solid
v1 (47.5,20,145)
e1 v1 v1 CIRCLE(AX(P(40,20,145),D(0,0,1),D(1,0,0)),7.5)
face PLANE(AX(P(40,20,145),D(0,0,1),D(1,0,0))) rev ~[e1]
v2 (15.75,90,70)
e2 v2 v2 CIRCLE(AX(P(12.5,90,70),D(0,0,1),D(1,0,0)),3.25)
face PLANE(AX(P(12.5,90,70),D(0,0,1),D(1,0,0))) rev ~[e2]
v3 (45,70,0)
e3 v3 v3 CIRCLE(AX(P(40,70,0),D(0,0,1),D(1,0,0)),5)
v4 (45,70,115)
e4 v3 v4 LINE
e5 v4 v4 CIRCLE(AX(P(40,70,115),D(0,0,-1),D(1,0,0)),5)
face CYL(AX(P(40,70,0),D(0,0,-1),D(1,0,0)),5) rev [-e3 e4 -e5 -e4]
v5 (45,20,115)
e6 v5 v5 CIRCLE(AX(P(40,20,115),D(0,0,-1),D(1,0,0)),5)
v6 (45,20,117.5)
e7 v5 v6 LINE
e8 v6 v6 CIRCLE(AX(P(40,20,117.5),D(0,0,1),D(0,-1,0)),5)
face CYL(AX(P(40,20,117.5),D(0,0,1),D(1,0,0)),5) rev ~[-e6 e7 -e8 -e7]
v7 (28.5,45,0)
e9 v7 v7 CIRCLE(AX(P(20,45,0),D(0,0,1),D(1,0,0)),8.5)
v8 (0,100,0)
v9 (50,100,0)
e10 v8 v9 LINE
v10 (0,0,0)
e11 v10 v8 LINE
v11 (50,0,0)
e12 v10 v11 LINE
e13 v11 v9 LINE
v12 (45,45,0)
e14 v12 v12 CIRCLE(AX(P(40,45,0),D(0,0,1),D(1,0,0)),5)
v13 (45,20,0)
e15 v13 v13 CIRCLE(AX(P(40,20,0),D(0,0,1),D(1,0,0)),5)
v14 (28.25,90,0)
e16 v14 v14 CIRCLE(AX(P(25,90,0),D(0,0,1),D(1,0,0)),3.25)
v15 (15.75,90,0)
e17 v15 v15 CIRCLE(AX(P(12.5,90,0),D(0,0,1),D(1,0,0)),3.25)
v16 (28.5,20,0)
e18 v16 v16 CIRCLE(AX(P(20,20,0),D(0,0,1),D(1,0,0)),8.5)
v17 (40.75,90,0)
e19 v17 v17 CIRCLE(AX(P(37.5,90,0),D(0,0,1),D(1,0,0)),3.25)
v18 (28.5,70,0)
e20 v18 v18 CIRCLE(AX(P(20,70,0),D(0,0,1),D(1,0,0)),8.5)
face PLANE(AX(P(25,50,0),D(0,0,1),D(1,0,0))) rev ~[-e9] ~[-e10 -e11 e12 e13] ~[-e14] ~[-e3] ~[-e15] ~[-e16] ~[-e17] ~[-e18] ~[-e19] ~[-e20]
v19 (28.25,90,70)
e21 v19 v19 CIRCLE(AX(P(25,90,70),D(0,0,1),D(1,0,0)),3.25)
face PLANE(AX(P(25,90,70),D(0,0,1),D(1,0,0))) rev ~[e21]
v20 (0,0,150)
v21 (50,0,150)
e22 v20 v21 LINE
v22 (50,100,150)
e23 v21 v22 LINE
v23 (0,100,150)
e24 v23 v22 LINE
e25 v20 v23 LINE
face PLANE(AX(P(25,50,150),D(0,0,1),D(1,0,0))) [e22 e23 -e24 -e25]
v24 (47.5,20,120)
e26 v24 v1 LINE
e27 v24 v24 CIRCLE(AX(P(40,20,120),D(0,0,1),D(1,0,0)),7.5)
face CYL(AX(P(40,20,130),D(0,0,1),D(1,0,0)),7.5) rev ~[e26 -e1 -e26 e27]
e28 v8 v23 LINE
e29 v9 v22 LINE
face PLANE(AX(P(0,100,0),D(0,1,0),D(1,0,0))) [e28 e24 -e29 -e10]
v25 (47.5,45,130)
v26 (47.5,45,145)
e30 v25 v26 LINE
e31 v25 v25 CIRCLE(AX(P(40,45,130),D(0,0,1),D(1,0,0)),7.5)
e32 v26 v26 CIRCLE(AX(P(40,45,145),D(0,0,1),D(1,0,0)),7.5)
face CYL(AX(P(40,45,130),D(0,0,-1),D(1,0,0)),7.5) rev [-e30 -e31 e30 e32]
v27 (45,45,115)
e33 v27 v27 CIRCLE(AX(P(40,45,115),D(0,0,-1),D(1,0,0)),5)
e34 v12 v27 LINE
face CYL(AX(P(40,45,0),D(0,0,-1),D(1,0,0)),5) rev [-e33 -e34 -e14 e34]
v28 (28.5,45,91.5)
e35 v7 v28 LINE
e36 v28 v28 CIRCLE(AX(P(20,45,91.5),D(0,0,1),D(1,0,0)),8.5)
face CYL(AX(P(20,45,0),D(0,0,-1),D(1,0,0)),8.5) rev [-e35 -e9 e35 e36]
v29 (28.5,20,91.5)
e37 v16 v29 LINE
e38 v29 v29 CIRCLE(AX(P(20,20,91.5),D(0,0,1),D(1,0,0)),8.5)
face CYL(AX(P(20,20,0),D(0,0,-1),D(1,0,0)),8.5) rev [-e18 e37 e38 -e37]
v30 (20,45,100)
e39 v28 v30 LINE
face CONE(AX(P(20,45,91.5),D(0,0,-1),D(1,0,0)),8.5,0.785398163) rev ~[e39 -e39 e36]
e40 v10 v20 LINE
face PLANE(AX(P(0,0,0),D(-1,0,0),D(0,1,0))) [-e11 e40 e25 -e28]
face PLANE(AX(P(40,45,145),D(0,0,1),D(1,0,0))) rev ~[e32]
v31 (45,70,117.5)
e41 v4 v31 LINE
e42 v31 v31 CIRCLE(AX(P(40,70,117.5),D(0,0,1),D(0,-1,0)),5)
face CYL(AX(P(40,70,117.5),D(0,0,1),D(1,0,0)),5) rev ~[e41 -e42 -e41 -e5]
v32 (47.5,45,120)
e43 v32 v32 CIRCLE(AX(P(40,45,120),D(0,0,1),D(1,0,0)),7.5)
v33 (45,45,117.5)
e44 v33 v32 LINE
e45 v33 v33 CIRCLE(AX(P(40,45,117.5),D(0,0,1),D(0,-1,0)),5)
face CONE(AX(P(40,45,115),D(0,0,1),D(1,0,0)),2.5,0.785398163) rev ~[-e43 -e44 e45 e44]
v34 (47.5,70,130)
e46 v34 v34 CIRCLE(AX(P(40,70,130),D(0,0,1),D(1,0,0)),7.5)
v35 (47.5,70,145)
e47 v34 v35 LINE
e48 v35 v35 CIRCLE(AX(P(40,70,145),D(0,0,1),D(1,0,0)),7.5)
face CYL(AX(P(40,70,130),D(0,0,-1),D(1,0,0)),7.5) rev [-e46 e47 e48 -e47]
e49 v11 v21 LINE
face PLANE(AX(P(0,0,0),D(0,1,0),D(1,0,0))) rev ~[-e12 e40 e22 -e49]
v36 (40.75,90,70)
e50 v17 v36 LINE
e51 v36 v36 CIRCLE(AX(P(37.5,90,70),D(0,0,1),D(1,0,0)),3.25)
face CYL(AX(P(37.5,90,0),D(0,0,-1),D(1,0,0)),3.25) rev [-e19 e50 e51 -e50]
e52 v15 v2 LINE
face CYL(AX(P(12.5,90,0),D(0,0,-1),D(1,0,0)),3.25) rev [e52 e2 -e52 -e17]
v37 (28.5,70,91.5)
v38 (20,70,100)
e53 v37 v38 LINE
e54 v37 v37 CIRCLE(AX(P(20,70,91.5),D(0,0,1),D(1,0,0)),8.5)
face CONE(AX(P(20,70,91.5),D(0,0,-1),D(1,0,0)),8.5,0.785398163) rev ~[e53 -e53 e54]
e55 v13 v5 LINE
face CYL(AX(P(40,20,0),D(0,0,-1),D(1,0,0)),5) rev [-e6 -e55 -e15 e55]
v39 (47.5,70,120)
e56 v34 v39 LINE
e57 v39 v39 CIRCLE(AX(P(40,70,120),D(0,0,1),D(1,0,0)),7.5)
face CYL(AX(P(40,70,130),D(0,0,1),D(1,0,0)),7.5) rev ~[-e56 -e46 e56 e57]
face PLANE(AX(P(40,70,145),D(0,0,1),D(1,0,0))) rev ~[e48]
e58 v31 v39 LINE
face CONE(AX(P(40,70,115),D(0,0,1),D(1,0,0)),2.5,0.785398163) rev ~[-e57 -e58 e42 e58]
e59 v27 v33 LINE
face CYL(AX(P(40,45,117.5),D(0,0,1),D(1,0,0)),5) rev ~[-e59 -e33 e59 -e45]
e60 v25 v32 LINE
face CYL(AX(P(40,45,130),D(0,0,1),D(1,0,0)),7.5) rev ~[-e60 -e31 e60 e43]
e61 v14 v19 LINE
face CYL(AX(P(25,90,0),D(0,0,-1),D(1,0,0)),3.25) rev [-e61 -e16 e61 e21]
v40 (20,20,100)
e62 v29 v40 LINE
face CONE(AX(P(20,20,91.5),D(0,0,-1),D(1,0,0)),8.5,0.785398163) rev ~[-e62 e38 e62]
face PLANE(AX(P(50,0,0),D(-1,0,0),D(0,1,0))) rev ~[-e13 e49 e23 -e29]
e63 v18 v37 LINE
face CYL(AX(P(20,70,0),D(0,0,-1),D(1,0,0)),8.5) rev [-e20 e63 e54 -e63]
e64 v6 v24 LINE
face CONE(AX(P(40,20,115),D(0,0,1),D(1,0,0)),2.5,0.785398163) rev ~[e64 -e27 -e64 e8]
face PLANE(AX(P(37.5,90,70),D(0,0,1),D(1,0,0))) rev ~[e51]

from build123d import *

# Parameters (mm, degrees)
F0_W          = 50
F0_H          = 100
F0_R          = 8.5
F0_R_2        = 5
F0_R_3        = 3.25
F1_DEPTH      = 150
F2_DEPTH      = 100
F3_DEPTH      = 70
F4_DEPTH      = 130
F8_R          = 7.5
F9_DEPTH      = 15
F10_S5_R      = 5
F10_T6_DEPTH  = 12
F10_S11_R     = 5
F10_T12_DEPTH = 12
F10_S17_R     = 5
F10_T18_DEPTH = 12
F11_SIZE      = 8.5


# Not quite as in the source:
# - a fillet or chamfer that OpenCascade refuses, or shapes differently, is made with other operations: its cross-section is extruded or revolved along the edge and cut away or added


with BuildPart() as f1:
    # F0 (on Top) → F1 (new body)
    with BuildSketch(Plane.XY):
        with Locations((25, 50)):
            Rectangle(F0_W, F0_H)
        with Locations((20, 20)):
            Circle(F0_R, mode=Mode.SUBTRACT)
        with Locations((20, 45)):
            Circle(F0_R, mode=Mode.SUBTRACT)
        with Locations((40, 20)):
            Circle(F0_R_2, mode=Mode.SUBTRACT)
        with Locations((40, 45)):
            Circle(F0_R_2, mode=Mode.SUBTRACT)
        with Locations((20, 70)):
            Circle(F0_R, mode=Mode.SUBTRACT)
        with Locations((12.5, 90)):
            Circle(F0_R_3, mode=Mode.SUBTRACT)
        with Locations((40, 70)):
            Circle(F0_R_2, mode=Mode.SUBTRACT)
        with Locations((25, 90)):
            Circle(F0_R_3, mode=Mode.SUBTRACT)
        with Locations((37.5, 90)):
            Circle(F0_R_3, mode=Mode.SUBTRACT)
        with Locations((12.5, 90)):
            Circle(F0_R_3)
        with Locations((25, 90)):
            Circle(F0_R_3)
        with Locations((37.5, 90)):
            Circle(F0_R_3)
        with Locations((40, 70)):
            Circle(F0_R_2)
        with Locations((20, 70)):
            Circle(F0_R)
        with Locations((40, 45)):
            Circle(F0_R_2)
        with Locations((40, 20)):
            Circle(F0_R_2)
        with Locations((20, 20)):
            Circle(F0_R)
        with Locations((20, 45)):
            Circle(F0_R)
    extrude(amount=F1_DEPTH)

    # F0 (on Top) → F2 (cut)
    with BuildSketch(Plane.XY):
        with Locations((20, 20)):
            Circle(F0_R)
        with Locations((20, 45)):
            Circle(F0_R)
        with Locations((20, 70)):
            Circle(F0_R)
    extrude(amount=F2_DEPTH, mode=Mode.SUBTRACT)

    # F0 (on Top) → F3 (cut)
    with BuildSketch(Plane.XY):
        with Locations((37.5, 90)):
            Circle(F0_R_3)
        with Locations((25, 90)):
            Circle(F0_R_3)
        with Locations((12.5, 90)):
            Circle(F0_R_3)
    extrude(amount=F3_DEPTH, mode=Mode.SUBTRACT)

    # F0 (on Top) → F4 (cut)
    with BuildSketch(Plane.XY):
        with Locations((40, 20)):
            Circle(F0_R_2)
        with Locations((40, 45)):
            Circle(F0_R_2)
        with Locations((40, 70)):
            Circle(F0_R_2)
    extrude(amount=F4_DEPTH, mode=Mode.SUBTRACT)

    # F8 (on 3pt) → F9 (cut, symmetric)
    with BuildSketch(Plane.XY.offset(130)):
        with Locations((40, 70)):
            Circle(F8_R)
        with Locations((40, 45)):
            Circle(F8_R)
        with Locations((40, 20)):
            Circle(F8_R)
    extrude(amount=F9_DEPTH, both=True, mode=Mode.SUBTRACT)

    # F10: chamfer of 5 on 3 edges, made by hand


with BuildPart() as f10_tool2:
    # F10_s3 → F10_t4 (revolve)
    with BuildSketch(Plane.XZ.offset(-70)):
        Polygon((42.5, 115), (47.5, 120), (47.5, 115), align=None)
    revolve(axis=Axis((40, 70, 115), (0, 0, 1)))

    # F10_s5 → F10_t6 (cut, symmetric)
    with BuildSketch(Plane.XY.offset(117.5)):
        with Locations((40, 70)):
            Circle(F10_S5_R)
    extrude(amount=F10_T6_DEPTH, both=True, mode=Mode.SUBTRACT)


with BuildPart() as f1_1:
    add(f1.part)

    # F10_t1: union F10_tool2
    add(f10_tool2.part)


with BuildPart() as f10_tool8:
    # F10_s9 → F10_t10 (revolve)
    with BuildSketch(Plane.XZ.offset(-45)):
        Polygon((42.5, 115), (47.5, 120), (47.5, 115), align=None)
    revolve(axis=Axis((40, 45, 115), (0, 0, 1)))

    # F10_s11 → F10_t12 (cut, symmetric)
    with BuildSketch(Plane.XY.offset(117.5)):
        with Locations((40, 45)):
            Circle(F10_S11_R)
    extrude(amount=F10_T12_DEPTH, both=True, mode=Mode.SUBTRACT)


with BuildPart() as f1_2:
    add(f1_1.part)

    # F10_t7: union F10_tool8
    add(f10_tool8.part)


with BuildPart() as f10_tool14:
    # F10_s15 → F10_t16 (revolve)
    with BuildSketch(Plane.XZ.offset(-20)):
        Polygon((42.5, 115), (47.5, 120), (47.5, 115), align=None)
    revolve(axis=Axis((40, 20, 115), (0, 0, 1)))

    # F10_s17 → F10_t18 (cut, symmetric)
    with BuildSketch(Plane.XY.offset(117.5)):
        with Locations((40, 20)):
            Circle(F10_S17_R)
    extrude(amount=F10_T18_DEPTH, both=True, mode=Mode.SUBTRACT)


with BuildPart() as f1_3:
    add(f1_2.part)

    # F10_t13: union F10_tool14
    add(f10_tool14.part)

    # F11
    f11_edges = [f1_3.edges().sort_by_distance(p)[0] for p in [
        (11.5, 70, 100),
        (11.5, 45, 100),
        (11.5, 20, 100),
    ]]
    chamfer(f11_edges, length=F11_SIZE)


solid = f1_3.part
